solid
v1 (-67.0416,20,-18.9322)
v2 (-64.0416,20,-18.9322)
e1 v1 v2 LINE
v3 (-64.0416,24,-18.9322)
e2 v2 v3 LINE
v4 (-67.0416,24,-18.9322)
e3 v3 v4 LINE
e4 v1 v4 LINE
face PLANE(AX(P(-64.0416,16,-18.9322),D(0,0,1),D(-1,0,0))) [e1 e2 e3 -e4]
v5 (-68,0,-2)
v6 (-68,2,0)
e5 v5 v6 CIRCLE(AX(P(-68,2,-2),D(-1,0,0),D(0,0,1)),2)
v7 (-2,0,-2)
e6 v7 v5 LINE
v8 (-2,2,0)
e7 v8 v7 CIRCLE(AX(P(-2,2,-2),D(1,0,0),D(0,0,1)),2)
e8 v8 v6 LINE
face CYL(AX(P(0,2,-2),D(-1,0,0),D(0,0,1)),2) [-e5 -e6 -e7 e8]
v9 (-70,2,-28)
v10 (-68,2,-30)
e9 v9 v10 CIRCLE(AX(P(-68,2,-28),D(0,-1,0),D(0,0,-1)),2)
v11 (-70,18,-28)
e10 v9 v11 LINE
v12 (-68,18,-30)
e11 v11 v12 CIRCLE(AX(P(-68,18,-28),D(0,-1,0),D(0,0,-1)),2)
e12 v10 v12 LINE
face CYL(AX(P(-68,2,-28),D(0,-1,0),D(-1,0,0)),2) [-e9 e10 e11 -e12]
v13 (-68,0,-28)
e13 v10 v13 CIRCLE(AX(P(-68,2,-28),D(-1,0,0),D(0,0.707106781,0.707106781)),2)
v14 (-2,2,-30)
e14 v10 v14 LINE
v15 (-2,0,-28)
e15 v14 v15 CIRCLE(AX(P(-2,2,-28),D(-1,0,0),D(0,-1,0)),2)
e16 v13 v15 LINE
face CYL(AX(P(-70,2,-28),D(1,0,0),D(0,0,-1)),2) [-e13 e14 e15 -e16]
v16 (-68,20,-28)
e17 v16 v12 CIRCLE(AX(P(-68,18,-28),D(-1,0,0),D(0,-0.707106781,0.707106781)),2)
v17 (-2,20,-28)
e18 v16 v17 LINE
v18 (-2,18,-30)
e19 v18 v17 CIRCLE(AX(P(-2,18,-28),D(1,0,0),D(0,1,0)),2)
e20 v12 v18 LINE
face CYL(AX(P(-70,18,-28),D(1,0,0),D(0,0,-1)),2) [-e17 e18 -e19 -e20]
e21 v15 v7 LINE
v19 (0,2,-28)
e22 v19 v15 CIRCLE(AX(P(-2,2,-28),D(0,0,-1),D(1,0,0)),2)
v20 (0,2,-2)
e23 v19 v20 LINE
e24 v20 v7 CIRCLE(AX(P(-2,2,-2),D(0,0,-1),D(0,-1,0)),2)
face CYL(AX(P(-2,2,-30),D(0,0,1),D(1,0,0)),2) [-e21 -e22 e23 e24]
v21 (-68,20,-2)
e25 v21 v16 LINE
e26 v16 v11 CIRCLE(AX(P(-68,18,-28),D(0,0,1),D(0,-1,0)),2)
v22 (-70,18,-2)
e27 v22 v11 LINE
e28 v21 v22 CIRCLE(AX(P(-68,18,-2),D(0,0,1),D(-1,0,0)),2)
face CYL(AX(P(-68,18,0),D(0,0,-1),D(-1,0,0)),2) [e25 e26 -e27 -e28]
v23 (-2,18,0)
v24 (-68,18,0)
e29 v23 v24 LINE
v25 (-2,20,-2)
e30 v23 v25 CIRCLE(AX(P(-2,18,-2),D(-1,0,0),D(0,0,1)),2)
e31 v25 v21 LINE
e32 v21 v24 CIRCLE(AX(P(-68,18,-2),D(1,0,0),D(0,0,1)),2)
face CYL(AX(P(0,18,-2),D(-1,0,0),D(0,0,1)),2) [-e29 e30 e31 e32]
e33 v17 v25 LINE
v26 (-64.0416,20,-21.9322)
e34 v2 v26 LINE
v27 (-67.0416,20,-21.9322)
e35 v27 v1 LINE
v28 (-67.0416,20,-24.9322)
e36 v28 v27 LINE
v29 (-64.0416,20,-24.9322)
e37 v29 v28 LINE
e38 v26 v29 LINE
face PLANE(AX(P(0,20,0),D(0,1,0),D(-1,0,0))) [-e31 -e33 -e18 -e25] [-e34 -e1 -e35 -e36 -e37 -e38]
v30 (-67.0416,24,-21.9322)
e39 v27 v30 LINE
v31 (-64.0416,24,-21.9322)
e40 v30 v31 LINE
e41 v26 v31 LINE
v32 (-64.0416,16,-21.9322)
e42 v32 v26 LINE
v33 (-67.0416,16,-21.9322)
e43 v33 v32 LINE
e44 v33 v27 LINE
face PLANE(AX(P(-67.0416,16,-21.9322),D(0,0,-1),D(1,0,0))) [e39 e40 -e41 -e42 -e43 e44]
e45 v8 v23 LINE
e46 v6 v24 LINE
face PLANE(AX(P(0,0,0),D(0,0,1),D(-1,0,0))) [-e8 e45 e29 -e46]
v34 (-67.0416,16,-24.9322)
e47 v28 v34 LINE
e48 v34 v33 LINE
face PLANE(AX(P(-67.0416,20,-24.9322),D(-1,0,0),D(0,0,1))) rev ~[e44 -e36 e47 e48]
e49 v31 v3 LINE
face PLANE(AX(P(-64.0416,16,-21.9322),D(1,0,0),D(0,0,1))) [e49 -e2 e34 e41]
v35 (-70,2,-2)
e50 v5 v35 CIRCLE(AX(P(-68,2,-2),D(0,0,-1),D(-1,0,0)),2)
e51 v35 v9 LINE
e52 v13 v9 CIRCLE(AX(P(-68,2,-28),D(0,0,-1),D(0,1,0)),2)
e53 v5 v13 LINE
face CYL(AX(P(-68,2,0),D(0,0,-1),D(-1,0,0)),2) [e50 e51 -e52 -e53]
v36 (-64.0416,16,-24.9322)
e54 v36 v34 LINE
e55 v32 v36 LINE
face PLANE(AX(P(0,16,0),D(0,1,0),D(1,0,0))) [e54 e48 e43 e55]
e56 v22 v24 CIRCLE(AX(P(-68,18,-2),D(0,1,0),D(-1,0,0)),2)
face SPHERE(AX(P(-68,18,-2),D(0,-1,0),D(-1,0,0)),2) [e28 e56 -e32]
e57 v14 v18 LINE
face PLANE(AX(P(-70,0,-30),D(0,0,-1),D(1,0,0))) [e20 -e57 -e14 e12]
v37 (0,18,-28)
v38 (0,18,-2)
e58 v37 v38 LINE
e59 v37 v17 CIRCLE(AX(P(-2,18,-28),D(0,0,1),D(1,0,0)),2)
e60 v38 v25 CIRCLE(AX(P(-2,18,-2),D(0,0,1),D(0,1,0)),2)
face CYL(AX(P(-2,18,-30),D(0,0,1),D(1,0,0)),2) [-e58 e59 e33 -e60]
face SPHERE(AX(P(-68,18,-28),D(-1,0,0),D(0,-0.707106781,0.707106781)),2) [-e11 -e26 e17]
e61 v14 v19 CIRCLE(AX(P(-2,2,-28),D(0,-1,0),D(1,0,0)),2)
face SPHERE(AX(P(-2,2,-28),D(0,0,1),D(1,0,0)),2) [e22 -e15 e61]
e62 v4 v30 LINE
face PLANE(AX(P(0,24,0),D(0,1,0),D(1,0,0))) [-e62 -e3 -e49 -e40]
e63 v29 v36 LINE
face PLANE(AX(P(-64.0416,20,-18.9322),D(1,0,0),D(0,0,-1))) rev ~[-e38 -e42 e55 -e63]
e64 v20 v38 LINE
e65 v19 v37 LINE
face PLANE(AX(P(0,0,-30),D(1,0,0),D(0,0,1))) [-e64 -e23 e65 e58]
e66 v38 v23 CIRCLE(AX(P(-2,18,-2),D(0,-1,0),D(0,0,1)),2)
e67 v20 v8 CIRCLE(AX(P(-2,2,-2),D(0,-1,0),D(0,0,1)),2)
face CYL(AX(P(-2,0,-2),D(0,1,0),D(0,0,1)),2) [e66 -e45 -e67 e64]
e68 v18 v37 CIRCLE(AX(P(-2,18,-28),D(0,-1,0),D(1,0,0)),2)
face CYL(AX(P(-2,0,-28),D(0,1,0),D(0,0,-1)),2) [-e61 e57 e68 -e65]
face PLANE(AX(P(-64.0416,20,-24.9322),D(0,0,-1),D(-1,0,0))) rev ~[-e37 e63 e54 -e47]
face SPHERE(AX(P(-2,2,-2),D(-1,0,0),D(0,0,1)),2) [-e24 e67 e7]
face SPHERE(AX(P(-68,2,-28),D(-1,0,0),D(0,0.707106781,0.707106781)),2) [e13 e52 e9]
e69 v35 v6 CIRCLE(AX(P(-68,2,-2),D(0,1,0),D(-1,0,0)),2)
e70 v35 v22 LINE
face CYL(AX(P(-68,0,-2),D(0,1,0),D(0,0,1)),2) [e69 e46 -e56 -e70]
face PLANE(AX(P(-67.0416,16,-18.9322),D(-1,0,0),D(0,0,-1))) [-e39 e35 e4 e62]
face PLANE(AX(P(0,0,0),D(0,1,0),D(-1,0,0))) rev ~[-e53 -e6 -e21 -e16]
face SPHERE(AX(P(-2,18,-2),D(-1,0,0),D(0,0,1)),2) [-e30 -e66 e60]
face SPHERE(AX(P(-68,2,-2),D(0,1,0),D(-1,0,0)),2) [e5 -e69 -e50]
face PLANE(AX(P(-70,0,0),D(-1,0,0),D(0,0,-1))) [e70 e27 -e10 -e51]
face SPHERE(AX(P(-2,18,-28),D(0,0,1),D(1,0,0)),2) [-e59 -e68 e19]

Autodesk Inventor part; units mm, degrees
ref_plane "YZ Plane" through (0, 0, 0) normal (1, 0, 0) x (0, 1, 0)
ref_plane "XZ Plane" through (0, 0, 0) normal (0, 1, 0) x (-1, 0, 0)
ref_plane "XY Plane" through (0, 0, 0) normal (0, 0, 1) x (1, 0, 0)
sketch "Sketch1" plane through (0, 0, 0) normal (0, 1, 0) x (-1, 0, 0)
  line L0 (0, 0) -> (70, 0)
  line L1 (70, 0) -> (70, -30)
  line L2 (70, -30) -> (0, -30)
  line L3 (0, -30) -> (0, 0)
  dimension "d0" = 70
  dimension "d1" = 30
extrude "Extrusion1" add sketch "Sketch1" along normal blind 20
fillet "Fillet1" radius 2 11 edges at (-70, 10, 0) (-70, 20, -15) (-35, 20, 0) (-70, 0, -15) (-35, 0, 0) (0, 10, 0) (0, 20, -15) (0, 0, -15) (0, 10, -30) (-35, 20, -30) (-35, 0, -30)
sketch "Sketch2" plane through (0, 20, 0) normal (0, 1, 0) x (1, 0, 0)
  line L0 (-67.0416, 18.9322) -> (-64.0416, 18.9322)
  line L1 (-64.0416, 18.9322) -> (-64.0416, 24.9322)
  line L2 (-64.0416, 24.9322) -> (-67.0416, 24.9322)
  line L3 (-67.0416, 24.9322) -> (-67.0416, 18.9322)
  point P0 (0, 0)
  dimension "d6" = 3
  dimension "d7" = 6
fillet "Fillet2" radius 2 3 edges at (-69.4142, 19.4142, -29.4142) (-69.4142, 0.5858, -29.4142) (-70, 10, -30)
extrude "Extrusion2" cut sketch "Sketch2" against normal blind 4
sketch "Sketch3" plane through (0, 16, 0) normal (0, 1, 0) x (1, 0, 0)
  line L0 (-64.0416, 18.9322) -> (-67.0416, 18.9322) projected
  line L1 (-67.0416, 18.9322) -> (-67.0416, 24.9322) projected
  line L2 (-64.0416, 18.9322) -> (-67.0416, 18.9322)
  line L3 (-67.0416, 18.9322) -> (-67.0416, 21.9322)
  line L4 (-67.0416, 21.9322) -> (-64.0416, 21.9322)
  line L5 (-64.0416, 21.9322) -> (-64.0416, 18.9322)
  point P0 (0, 0)
extrude "Extrusion3" add sketch "Sketch3" along normal blind 8
equation "\"BendRadius\" = Thickness"
equation "\"BendReliefWidth\" = Thickness"
equation "\"BendReliefDepth\" = 0.5 * Thickness"
equation "\"CornerReliefSize\" = 4 * Thickness"
equation "\"MinimumRemnant\" = 2 * Thickness"
equation "\"TransitionRadius\" = BendRadius"
equation "\"JacobiRadiusSize\" = BendRadius"
equation "\"GapSize\" = Thickness"
equation "\"Thickness\" = 0.5"
